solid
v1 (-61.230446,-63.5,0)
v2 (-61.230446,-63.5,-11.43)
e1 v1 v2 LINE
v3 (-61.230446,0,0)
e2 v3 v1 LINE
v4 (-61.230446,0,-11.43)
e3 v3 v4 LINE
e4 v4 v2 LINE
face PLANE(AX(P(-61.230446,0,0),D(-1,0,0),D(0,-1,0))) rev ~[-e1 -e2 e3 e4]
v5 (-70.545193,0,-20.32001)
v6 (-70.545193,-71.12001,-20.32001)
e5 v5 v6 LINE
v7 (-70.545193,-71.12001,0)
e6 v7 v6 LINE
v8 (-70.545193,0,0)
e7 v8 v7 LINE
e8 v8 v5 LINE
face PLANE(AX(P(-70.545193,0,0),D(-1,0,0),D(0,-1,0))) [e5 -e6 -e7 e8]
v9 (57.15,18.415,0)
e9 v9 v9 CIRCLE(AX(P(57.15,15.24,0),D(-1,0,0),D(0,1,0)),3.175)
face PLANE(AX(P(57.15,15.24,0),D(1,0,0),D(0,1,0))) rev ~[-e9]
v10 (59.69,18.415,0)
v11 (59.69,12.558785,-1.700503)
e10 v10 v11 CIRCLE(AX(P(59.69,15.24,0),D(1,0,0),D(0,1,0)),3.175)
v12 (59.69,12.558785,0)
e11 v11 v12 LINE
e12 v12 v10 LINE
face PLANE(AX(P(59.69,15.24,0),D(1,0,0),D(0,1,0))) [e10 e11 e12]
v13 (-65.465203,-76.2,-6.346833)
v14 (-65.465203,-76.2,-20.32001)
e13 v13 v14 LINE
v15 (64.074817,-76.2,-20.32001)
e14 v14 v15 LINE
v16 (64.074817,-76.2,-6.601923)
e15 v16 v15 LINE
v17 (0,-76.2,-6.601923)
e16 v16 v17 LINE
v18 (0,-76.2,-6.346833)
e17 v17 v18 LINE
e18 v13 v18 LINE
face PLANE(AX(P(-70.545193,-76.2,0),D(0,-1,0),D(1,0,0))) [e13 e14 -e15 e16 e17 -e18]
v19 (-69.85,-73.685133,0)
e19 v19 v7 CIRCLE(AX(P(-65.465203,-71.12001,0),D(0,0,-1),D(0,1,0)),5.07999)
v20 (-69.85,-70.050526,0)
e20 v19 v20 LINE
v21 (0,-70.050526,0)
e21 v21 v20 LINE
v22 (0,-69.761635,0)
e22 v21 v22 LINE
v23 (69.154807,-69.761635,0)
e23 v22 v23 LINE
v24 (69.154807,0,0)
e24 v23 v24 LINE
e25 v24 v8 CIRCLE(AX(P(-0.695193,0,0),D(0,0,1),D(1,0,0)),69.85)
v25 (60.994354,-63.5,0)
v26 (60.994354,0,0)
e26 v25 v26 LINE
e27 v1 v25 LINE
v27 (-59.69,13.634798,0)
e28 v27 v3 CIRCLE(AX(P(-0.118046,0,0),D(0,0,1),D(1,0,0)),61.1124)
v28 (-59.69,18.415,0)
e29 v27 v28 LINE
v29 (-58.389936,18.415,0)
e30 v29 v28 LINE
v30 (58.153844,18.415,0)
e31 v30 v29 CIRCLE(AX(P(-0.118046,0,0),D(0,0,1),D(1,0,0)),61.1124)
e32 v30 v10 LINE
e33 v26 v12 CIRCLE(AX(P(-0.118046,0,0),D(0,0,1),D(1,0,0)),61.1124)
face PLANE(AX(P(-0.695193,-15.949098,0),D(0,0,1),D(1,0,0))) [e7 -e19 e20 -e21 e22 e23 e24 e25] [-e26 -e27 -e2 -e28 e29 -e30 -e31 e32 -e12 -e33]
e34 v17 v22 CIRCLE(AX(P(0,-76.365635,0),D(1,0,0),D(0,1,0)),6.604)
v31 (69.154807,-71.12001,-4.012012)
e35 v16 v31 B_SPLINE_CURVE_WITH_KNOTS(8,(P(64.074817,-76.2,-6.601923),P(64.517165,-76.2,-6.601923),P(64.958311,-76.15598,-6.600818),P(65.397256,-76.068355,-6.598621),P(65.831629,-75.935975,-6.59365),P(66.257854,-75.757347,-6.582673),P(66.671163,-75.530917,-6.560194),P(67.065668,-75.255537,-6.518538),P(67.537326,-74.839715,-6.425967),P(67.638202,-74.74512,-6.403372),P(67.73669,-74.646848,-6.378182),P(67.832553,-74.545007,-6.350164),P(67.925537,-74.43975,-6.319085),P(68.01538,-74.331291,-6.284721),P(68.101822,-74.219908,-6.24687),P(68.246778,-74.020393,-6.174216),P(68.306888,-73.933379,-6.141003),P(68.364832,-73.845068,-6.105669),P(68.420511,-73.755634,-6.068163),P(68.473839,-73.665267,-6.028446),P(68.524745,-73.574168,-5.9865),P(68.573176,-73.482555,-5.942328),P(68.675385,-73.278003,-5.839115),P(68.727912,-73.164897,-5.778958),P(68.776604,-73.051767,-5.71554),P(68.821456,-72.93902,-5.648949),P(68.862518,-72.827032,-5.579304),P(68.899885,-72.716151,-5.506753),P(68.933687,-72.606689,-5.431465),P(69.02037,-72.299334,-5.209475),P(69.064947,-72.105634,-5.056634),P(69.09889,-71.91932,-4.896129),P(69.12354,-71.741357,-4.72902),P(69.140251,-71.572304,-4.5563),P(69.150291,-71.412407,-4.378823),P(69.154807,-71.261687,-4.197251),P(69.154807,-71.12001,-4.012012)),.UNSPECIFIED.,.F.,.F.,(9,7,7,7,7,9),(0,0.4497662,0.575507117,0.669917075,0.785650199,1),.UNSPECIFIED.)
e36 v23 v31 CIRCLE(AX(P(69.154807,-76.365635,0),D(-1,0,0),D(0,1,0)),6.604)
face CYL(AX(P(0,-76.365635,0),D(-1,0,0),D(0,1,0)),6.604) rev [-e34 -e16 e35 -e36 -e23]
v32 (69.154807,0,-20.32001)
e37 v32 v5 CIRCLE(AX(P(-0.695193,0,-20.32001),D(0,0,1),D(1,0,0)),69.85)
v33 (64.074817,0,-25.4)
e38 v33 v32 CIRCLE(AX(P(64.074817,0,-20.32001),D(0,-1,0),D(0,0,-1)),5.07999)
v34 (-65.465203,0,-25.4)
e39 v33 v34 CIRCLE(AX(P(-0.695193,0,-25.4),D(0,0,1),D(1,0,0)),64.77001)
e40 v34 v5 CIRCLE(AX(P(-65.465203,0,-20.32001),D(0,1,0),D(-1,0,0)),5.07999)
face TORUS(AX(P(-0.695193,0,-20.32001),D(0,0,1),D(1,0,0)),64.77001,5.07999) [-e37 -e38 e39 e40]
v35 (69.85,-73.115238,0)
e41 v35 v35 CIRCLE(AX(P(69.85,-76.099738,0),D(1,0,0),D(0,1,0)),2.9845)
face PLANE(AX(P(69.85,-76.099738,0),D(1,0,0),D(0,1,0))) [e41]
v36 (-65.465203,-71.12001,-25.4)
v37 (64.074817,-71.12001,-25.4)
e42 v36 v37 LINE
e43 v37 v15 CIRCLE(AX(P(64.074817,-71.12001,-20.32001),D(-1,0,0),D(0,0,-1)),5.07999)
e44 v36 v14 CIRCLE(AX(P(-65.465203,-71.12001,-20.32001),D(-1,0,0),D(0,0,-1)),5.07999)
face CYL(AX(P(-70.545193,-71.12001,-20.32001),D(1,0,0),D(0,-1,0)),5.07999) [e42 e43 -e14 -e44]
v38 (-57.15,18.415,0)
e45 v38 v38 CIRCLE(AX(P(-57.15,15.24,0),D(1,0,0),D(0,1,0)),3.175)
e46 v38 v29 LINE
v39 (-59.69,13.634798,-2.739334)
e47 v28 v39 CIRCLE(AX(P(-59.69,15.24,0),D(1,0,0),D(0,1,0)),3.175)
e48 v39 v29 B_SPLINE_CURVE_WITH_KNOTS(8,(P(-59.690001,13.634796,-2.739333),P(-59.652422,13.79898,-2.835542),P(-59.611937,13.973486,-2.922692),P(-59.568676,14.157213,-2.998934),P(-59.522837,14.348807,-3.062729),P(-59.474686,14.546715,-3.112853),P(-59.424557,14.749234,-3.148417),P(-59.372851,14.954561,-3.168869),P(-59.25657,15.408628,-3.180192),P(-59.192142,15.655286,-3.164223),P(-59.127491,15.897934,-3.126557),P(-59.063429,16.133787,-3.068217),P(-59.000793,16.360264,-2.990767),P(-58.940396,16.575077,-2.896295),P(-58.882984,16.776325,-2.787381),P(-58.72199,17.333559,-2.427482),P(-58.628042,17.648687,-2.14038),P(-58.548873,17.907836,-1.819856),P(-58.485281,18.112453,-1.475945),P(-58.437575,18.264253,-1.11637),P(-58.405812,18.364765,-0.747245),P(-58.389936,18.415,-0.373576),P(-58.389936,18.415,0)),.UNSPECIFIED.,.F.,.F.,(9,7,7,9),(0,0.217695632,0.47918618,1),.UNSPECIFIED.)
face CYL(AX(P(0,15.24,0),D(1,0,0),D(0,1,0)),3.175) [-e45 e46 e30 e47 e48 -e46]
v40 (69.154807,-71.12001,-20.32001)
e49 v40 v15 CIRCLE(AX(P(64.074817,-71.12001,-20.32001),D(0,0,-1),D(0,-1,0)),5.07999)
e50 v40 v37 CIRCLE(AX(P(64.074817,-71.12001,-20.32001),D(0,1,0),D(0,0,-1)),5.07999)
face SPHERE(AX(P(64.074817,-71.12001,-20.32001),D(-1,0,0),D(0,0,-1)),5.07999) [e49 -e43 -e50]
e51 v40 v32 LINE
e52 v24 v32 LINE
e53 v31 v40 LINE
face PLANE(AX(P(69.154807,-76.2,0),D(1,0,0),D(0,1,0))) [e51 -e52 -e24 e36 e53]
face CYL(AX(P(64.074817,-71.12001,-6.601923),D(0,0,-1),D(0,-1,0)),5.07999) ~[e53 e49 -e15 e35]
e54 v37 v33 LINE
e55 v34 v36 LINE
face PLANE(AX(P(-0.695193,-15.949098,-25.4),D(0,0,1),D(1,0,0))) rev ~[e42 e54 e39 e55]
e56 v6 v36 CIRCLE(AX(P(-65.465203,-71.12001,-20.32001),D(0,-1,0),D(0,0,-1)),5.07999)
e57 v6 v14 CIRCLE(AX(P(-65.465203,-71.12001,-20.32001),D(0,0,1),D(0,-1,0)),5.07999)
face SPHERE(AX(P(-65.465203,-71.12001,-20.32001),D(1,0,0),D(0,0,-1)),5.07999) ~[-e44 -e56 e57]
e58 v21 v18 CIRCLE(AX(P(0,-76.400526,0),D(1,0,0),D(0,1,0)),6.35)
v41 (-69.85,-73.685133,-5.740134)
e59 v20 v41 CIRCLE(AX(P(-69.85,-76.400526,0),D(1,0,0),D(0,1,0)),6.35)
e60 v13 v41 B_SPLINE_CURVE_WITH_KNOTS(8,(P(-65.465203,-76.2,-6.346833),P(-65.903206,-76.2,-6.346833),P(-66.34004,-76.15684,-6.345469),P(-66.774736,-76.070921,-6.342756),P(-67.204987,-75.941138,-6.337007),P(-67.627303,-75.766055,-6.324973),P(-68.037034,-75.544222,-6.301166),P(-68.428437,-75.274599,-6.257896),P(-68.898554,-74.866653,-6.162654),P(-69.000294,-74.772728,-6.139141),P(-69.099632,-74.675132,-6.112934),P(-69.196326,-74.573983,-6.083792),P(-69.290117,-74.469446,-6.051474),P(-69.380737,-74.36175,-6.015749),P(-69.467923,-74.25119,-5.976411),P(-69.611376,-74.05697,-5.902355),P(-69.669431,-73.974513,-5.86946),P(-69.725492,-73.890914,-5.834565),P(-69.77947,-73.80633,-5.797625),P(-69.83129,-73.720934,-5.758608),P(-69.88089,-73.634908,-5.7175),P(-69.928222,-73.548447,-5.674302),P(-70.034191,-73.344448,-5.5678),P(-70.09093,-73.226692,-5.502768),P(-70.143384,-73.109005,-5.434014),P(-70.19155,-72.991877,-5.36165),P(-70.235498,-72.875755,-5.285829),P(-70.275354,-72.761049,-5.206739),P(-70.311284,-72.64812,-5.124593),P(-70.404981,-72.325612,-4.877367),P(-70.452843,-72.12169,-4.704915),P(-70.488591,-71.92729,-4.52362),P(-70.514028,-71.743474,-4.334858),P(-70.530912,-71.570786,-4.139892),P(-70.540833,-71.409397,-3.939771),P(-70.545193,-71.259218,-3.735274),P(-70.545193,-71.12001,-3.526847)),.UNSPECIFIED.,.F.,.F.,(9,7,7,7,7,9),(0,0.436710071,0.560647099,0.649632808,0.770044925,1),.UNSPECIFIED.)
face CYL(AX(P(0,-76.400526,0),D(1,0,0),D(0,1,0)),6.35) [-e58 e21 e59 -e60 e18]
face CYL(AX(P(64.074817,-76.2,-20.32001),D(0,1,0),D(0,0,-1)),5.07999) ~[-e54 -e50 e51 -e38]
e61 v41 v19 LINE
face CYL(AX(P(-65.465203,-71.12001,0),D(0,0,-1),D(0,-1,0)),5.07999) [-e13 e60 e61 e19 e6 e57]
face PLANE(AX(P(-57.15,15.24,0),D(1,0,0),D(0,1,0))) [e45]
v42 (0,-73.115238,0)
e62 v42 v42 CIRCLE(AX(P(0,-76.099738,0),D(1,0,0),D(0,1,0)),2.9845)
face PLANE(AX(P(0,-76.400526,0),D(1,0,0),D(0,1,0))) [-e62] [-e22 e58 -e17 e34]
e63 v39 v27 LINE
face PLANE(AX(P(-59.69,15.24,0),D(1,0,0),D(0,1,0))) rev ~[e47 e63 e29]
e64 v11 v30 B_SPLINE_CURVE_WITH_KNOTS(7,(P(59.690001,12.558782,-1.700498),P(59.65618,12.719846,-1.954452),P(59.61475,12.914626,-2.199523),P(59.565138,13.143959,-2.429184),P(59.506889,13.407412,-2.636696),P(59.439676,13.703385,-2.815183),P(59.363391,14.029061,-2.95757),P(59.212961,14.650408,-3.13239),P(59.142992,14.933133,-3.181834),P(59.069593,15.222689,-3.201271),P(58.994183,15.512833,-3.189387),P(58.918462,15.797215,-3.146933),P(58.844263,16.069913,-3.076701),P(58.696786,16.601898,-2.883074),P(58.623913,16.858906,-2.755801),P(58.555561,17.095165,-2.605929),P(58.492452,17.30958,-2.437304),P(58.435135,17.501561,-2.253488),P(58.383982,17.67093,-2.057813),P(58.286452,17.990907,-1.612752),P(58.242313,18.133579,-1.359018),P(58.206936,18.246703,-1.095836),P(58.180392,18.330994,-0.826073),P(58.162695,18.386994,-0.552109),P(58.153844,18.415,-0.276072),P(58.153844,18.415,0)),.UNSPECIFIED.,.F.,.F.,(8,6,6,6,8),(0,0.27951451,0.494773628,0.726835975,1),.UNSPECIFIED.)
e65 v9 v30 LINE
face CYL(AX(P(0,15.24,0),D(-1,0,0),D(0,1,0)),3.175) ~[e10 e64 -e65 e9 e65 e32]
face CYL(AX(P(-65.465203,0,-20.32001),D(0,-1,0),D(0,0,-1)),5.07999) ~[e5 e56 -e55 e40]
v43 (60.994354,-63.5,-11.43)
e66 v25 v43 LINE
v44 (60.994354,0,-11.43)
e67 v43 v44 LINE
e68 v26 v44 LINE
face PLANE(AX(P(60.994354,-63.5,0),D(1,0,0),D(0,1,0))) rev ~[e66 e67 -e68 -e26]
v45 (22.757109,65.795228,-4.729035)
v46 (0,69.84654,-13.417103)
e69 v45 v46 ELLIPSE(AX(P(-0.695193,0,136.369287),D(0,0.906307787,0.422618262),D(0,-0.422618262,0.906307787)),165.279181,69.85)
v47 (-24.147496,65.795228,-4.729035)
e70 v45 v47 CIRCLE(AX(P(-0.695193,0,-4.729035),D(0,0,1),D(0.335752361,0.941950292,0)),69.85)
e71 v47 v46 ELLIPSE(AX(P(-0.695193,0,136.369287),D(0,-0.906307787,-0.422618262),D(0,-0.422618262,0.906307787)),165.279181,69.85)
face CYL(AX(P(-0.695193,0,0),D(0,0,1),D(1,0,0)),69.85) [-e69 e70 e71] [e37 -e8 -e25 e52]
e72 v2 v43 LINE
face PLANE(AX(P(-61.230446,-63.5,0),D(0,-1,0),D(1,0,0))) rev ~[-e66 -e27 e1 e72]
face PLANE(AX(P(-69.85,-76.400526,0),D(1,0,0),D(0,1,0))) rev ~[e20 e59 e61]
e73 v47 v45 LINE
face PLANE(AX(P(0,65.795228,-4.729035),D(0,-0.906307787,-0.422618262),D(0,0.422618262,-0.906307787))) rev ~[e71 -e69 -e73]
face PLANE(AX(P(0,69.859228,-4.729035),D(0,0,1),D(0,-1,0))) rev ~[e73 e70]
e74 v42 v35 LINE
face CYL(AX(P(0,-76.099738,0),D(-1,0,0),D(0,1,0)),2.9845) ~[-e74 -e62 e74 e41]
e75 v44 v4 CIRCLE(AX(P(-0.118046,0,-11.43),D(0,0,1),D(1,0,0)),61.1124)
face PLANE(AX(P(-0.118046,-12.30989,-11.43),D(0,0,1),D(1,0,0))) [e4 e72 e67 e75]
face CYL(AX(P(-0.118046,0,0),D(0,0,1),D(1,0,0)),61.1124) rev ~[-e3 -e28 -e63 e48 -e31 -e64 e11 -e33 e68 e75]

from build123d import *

# Parameters (mm, degrees)
F4_DEPTH       = 25.4
F1_R           = 6.35
F5_DEPTH       = 69.85
F3_R           = 6.604
F6_DEPTH       = 69.85
F7_R           = 5.07999
F2_R           = 2.9845
F8_DEPTH       = 69.85
F10_DEPTH      = 11.43
F12_DEPTH      = 25.4
F12_DEPTH_BACK = 25.4
F13_R          = 3.175
F14_DEPTH      = 59.69
F14_DEPTH_BACK = 59.69
F15_R          = 3.1877
F16_DEPTH      = 57.15
F16_DEPTH_BACK = 57.15


# Not quite as in the source:
# - a fillet or chamfer is up to 0.001 mm smaller than in the source, because OpenCascade refuses the exact size


with BuildPart() as f4:
    # F0 (on Top) → F4 (new body)
    with BuildSketch(Plane.XY):
        with BuildLine():
            Line((69.1548068551, -76.2), (69.1548068551, 0))
            ThreePointArc((69.1548068551, 0), (-0.6951931449, 69.85), (-70.5451931449, 0))
            Line((-70.5451931449, 0), (-70.5451931449, -76.2))
            Line((-70.5451931449, -76.2), (69.1548068551, -76.2))
        make_face()
    extrude(amount=-F4_DEPTH)

    # F1 (on Right) → F5 (join)
    with BuildSketch(Plane.YZ):
        with Locations((-76.4005258679, 0)):
            Circle(F1_R)
    extrude(amount=-F5_DEPTH)

    # F3 (on Right) → F6 (cut)
    with BuildSketch(Plane.YZ):
        with Locations((-76.365634799, 0)):
            Circle(F3_R)
    extrude(amount=F6_DEPTH, mode=Mode.SUBTRACT)

    # F7 (radius 5.08 in the source; OpenCascade refuses exactly that, so slightly less here)
    f7_edges = [f4.edges().sort_by_distance(p)[0] for p in [
        (-0.695193, -76.2, -25.4),
        (-70.545193, -38.1, -25.4),
        (-70.545193, -76.2, -12.7),
        (69.154807, -76.2, -16.000961),
    ]]
    fillet(f7_edges, radius=F7_R)

    # F2 (on Right) → F8 (join)
    with BuildSketch(Plane.YZ):
        with Locations((-76.0997384787, 0)):
            Circle(F2_R)
    extrude(amount=F8_DEPTH)

    # F9 (on Top) → F10 (cut)
    with BuildSketch(Plane.XY):
        with BuildLine():
            Line((60.994354069, -63.5), (60.994354069, 0))
            ThreePointArc((60.994354069, 0), (-0.118045931, 61.1124), (-61.230445931, 0))
            Line((-61.230445931, 0), (-61.230445931, -63.5))
            Line((-61.230445931, -63.5), (60.994354069, -63.5))
        make_face()
    extrude(amount=-F10_DEPTH, mode=Mode.SUBTRACT)

    # F11 (on Right) → F12 (cut, two sides)
    with BuildSketch(Plane.YZ) as f12_sk:
        Polygon((71.3768934982, -16.6989553797), (69.8592278852, 0), (69.8592278852, -4.7290348448), (65.7952278852, -4.7290348448), align=None)
    extrude(amount=-F12_DEPTH, mode=Mode.SUBTRACT)
    extrude(f12_sk.sketch, amount=F12_DEPTH_BACK, mode=Mode.SUBTRACT)

    # F13 (on Right) → F14 (join, two sides)
    with BuildSketch(Plane.YZ) as f14_sk:
        with Locations((15.24, 0)):
            Circle(F13_R)
    extrude(amount=F14_DEPTH)
    extrude(f14_sk.sketch, amount=-F14_DEPTH_BACK)

    # F15 (on Right) → F16 (cut, two sides)
    with BuildSketch(Plane.YZ) as f16_sk:
        with Locations((15.24, 0)):
            Circle(F15_R)
    extrude(amount=-F16_DEPTH, mode=Mode.SUBTRACT)
    extrude(f16_sk.sketch, amount=F16_DEPTH_BACK, mode=Mode.SUBTRACT)


solid = f4.part
